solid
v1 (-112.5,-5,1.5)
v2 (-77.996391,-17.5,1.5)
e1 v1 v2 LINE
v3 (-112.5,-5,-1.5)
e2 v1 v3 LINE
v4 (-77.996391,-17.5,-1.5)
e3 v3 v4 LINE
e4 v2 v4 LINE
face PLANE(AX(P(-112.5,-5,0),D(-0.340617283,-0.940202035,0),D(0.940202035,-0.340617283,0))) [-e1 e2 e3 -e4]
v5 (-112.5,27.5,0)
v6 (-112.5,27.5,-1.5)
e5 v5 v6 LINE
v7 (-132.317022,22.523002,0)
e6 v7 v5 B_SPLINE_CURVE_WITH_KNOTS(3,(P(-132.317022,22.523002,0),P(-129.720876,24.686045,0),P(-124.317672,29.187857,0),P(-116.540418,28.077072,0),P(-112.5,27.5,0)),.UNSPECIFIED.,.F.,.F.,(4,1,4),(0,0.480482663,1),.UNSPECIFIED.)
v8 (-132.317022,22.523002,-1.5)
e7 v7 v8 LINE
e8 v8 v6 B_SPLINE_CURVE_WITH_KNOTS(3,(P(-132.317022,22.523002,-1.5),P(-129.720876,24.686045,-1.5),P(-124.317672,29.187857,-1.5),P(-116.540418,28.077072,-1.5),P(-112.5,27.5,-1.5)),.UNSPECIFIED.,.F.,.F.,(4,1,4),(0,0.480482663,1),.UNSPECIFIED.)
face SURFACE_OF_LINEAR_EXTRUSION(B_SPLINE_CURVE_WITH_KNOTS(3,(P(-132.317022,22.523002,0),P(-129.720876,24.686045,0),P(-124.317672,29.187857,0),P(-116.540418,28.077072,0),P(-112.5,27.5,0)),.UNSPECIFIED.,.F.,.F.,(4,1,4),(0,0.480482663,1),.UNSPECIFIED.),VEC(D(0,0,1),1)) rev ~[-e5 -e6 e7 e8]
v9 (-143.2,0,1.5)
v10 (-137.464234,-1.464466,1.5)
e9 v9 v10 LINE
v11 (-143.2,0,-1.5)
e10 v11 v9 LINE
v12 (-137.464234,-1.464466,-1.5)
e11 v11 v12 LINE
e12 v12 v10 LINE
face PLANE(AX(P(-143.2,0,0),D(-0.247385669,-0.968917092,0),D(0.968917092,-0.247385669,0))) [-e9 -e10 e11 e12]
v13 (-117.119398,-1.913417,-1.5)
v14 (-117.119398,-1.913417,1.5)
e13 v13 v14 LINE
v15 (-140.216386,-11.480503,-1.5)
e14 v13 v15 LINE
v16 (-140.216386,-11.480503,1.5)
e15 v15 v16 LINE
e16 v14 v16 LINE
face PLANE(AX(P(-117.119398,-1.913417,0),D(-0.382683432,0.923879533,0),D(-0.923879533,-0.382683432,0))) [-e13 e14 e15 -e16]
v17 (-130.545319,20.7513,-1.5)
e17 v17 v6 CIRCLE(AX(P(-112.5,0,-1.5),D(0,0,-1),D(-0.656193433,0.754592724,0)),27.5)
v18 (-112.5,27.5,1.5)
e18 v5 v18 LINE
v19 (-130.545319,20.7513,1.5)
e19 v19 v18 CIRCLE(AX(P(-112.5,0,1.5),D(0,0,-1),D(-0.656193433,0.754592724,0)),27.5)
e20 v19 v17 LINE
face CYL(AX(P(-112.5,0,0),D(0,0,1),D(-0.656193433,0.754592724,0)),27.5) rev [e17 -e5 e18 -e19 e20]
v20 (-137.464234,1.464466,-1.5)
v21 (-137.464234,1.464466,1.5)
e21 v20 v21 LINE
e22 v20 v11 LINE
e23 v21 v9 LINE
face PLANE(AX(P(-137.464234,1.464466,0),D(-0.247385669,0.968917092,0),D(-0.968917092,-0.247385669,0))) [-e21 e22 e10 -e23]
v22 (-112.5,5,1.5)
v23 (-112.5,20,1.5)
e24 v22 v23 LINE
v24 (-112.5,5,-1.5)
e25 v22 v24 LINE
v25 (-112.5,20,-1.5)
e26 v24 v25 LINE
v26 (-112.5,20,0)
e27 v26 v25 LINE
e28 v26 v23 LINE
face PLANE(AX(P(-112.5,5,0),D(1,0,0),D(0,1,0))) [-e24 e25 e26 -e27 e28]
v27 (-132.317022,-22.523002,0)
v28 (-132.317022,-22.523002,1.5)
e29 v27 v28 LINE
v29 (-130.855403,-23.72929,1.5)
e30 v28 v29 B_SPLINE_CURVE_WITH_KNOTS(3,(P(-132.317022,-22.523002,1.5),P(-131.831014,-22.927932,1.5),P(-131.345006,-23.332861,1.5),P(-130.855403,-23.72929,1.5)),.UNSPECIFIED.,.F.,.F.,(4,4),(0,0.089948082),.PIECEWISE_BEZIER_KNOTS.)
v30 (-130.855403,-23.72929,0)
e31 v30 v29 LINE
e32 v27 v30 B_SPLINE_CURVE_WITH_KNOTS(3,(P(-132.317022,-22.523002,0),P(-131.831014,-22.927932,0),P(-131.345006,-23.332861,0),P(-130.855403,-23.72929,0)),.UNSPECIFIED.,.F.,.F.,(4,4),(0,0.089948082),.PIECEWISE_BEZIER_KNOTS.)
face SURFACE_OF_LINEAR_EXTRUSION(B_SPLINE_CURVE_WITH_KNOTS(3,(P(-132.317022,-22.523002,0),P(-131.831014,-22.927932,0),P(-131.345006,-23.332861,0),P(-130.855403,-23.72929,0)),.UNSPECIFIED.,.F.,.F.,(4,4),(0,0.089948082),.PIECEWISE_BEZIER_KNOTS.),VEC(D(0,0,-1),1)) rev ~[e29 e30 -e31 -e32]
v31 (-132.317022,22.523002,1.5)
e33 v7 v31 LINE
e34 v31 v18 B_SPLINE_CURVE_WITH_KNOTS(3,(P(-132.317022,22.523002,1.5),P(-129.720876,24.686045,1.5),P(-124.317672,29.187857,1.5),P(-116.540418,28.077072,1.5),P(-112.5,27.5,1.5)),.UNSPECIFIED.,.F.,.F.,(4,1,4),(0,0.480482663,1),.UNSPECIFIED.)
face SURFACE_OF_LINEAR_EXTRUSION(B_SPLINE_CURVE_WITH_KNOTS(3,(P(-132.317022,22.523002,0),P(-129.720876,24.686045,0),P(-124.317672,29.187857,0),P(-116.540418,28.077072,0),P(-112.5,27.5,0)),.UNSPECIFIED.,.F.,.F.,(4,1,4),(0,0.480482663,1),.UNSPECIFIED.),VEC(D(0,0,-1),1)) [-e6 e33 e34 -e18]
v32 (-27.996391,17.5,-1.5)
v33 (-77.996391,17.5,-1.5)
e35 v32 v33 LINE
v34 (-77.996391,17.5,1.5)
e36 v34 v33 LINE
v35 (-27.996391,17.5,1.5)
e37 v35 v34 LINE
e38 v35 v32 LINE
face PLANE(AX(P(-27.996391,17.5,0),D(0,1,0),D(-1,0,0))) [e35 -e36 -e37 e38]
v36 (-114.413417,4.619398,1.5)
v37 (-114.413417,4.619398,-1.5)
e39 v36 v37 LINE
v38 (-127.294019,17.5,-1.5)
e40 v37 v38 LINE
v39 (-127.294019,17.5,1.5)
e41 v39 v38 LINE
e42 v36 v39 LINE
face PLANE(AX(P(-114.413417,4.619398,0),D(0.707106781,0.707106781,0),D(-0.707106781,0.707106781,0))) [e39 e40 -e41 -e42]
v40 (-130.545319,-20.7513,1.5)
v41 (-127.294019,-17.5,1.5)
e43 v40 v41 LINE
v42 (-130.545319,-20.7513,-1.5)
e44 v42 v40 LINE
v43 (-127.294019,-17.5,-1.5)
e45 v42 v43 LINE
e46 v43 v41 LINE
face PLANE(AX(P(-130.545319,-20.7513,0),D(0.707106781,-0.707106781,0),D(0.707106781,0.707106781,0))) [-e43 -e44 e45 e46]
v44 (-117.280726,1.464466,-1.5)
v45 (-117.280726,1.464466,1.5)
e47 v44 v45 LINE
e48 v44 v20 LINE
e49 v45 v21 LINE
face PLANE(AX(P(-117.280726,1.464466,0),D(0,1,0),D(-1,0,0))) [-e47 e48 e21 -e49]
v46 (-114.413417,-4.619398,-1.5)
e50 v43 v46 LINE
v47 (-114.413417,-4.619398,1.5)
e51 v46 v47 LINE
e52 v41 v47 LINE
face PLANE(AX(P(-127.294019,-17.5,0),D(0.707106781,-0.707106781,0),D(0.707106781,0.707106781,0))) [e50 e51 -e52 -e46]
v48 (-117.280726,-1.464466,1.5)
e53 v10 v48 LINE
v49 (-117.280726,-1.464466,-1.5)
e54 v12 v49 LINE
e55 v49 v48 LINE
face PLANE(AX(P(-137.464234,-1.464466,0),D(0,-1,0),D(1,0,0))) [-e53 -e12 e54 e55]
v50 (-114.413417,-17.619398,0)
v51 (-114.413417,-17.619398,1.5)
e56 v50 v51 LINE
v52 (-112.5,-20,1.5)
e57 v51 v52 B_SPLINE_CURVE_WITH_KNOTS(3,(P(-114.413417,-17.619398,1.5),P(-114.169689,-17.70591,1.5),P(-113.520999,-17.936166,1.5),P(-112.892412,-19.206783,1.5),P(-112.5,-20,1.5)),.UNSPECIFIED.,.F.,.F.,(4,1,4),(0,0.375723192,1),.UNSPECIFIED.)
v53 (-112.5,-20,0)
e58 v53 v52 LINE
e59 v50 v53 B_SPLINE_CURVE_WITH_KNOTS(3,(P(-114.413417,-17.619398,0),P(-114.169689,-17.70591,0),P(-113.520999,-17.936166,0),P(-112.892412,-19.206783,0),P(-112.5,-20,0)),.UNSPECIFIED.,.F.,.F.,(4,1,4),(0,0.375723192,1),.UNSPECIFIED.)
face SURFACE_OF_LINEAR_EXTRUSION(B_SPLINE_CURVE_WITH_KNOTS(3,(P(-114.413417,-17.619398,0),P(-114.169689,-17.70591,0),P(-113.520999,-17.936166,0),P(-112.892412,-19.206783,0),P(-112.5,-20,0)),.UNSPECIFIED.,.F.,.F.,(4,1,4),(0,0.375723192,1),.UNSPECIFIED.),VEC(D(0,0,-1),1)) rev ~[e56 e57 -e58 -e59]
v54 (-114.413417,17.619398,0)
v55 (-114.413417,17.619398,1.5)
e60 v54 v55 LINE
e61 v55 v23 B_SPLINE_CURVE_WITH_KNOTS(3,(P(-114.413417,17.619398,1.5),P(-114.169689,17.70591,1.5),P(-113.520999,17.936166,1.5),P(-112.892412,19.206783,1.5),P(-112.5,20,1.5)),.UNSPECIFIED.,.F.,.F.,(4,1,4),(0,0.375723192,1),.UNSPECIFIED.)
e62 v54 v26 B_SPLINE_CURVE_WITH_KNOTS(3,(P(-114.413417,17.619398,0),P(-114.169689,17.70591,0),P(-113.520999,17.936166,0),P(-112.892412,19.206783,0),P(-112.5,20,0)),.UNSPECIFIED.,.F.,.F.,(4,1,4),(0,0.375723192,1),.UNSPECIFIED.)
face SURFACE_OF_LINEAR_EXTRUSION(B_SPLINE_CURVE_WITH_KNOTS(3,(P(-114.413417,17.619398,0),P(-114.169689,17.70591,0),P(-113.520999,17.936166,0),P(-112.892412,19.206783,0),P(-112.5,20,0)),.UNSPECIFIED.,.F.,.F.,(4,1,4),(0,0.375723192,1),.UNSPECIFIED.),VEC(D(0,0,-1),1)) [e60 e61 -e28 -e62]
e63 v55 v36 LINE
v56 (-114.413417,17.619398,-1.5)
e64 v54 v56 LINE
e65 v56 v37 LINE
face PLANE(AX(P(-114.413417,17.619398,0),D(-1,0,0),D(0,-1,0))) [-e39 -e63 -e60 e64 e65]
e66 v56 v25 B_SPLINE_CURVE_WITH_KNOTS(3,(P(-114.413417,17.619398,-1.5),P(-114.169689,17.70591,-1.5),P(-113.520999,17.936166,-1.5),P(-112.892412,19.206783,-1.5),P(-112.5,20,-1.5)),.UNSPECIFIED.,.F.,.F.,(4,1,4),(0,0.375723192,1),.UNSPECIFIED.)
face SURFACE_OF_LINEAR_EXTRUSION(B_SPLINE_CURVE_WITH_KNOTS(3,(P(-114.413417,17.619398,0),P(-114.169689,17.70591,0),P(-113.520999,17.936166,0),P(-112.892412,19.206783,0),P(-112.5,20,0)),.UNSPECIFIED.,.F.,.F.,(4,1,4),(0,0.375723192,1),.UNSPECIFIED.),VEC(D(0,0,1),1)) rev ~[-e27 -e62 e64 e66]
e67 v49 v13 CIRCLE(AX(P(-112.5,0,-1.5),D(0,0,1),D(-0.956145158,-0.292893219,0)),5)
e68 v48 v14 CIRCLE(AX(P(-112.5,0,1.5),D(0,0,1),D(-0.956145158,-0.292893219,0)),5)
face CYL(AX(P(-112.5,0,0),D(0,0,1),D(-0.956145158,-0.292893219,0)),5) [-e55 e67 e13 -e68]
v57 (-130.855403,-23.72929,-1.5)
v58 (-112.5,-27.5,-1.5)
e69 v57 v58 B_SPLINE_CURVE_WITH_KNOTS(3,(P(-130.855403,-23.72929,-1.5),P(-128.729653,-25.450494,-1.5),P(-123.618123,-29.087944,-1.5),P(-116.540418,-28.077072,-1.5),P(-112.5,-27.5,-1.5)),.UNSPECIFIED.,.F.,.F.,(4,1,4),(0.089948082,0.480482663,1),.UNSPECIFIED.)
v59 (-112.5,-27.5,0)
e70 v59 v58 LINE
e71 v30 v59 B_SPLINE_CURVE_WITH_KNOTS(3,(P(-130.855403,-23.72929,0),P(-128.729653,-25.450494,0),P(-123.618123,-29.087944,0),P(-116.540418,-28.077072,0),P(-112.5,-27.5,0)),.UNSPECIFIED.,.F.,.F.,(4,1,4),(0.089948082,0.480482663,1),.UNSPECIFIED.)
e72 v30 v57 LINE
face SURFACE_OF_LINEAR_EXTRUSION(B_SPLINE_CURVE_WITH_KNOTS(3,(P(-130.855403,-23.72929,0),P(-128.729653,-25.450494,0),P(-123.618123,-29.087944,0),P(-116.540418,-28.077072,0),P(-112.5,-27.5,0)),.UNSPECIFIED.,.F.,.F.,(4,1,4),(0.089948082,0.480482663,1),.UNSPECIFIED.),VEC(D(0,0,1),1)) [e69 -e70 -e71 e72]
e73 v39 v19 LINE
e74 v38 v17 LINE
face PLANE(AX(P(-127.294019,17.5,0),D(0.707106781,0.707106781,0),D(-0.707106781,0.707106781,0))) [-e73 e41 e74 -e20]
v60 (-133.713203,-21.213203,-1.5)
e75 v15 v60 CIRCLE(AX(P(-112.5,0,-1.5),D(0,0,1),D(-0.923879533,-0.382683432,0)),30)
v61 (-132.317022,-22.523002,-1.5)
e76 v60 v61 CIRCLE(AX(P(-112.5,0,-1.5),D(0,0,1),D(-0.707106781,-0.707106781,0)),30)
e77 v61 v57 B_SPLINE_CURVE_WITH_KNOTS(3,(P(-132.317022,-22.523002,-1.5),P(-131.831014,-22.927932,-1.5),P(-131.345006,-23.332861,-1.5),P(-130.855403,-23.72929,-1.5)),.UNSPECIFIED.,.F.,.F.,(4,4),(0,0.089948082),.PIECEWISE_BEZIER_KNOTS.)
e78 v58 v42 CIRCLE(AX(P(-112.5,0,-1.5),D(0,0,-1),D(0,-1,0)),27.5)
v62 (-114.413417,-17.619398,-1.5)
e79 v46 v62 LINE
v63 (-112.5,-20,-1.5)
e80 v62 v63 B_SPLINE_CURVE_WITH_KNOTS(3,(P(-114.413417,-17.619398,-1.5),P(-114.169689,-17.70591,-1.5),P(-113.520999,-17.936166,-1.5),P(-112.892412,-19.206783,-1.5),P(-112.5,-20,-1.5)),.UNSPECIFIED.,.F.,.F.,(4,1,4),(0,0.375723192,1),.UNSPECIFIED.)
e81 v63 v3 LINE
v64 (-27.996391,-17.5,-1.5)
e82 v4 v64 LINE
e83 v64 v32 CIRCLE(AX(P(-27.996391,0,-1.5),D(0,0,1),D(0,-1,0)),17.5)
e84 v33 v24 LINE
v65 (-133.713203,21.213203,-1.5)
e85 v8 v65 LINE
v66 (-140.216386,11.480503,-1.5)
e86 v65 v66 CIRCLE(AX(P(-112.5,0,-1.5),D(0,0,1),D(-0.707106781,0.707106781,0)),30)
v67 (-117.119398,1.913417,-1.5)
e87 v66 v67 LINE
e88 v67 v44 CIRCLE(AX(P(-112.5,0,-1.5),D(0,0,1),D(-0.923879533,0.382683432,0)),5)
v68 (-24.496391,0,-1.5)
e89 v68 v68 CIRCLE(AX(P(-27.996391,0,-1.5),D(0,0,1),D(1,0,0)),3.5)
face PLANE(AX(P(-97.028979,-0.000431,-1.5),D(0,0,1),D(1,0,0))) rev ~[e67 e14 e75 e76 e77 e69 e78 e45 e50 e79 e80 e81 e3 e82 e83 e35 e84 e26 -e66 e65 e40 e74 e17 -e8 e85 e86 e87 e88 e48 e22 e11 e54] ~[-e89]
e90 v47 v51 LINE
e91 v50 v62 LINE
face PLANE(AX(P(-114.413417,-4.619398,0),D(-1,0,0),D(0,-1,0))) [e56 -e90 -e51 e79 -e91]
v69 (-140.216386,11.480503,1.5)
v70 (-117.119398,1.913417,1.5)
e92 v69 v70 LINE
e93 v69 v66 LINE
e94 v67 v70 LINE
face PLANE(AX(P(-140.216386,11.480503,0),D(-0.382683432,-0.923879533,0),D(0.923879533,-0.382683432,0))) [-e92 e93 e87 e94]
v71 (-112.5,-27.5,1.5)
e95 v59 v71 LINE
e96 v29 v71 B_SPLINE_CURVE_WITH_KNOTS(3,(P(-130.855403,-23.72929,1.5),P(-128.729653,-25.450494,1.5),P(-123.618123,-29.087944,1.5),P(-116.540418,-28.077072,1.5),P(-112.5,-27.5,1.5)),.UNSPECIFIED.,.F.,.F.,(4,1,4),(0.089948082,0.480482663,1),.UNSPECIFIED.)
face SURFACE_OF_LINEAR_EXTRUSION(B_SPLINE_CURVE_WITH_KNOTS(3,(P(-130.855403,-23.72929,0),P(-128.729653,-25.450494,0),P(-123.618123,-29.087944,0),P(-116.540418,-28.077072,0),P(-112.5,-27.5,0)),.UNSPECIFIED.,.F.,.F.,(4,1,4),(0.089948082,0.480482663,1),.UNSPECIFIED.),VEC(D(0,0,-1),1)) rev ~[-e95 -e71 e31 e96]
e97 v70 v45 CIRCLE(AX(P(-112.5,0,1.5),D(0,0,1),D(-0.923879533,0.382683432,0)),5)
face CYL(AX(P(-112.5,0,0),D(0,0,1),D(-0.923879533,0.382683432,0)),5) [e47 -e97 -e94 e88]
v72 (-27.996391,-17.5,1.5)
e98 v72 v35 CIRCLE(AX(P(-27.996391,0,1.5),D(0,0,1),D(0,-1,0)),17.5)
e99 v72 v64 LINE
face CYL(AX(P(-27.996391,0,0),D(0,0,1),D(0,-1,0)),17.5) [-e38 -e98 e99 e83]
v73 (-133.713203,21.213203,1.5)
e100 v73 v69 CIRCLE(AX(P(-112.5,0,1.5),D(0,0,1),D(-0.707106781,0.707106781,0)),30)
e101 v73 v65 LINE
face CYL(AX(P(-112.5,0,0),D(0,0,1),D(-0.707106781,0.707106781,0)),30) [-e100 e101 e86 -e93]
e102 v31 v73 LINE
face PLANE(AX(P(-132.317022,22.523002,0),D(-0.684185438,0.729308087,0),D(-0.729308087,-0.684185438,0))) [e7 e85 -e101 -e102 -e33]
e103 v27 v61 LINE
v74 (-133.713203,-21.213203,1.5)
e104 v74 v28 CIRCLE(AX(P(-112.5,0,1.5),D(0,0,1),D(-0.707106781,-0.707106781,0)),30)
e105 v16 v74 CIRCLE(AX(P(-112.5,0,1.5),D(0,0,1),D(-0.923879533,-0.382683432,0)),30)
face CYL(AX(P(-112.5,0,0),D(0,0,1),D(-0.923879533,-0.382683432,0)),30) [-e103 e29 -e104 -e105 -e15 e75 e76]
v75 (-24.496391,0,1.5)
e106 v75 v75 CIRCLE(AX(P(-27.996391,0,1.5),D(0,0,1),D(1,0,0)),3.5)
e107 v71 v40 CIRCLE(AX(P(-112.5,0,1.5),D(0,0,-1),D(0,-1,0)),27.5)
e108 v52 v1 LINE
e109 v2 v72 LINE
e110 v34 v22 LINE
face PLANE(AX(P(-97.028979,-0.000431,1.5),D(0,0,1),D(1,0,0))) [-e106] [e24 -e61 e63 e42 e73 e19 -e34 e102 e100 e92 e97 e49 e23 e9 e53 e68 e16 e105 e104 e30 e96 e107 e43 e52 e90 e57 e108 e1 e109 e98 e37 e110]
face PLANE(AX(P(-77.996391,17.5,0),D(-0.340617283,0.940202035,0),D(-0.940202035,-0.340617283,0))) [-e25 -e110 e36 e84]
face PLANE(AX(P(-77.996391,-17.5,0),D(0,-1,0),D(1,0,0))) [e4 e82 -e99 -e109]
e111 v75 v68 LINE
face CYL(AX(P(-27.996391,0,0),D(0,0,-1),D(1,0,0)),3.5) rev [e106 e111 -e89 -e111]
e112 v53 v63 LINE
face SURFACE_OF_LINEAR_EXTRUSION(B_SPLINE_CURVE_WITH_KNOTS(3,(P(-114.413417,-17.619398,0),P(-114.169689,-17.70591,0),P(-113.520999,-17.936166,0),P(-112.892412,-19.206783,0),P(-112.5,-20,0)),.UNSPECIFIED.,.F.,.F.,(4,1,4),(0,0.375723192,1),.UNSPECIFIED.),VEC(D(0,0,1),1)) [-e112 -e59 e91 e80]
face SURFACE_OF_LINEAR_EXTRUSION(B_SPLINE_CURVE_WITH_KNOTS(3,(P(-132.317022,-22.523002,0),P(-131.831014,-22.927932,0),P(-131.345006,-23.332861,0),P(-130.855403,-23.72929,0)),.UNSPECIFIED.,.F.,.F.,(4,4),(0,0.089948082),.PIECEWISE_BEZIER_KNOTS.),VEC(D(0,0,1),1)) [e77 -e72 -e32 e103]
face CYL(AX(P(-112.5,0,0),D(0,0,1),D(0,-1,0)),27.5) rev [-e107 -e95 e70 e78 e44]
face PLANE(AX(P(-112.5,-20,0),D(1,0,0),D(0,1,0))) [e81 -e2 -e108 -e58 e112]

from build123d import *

# Parameters (mm, degrees)
F0_R     = 3.5
F1_DEPTH = 1.5


# Not quite as in the source:
# - a feature names something its author has since deleted; it is built from what else it names


with BuildPart() as f1:
    # F0 (on Top) → F1 (new body, symmetric)
    with BuildSketch(Plane.XY):
        with BuildLine():
            Line((-140.2163859753, 11.480502971), (-117.1193976626, 1.9134171618))
            ThreePointArc((-117.1193976626, 1.9134171618), (-117.2054191616, 1.6908667936), (-117.2807257879, 1.4644660941))
            Line((-117.2807257879, 1.4644660941), (-135.5639451435, 1.4644660941))
            Line((-135.5639451435, 1.4644660941), (-137.4212426417, 1.4644660941))
            Line((-137.4212426417, 1.4644660941), (-137.4642343313, 1.4644660941))
            Line((-137.4642343313, 1.4644660941), (-143.2, 0))
            Line((-143.2, 0), (-137.4642343313, -1.4644660941))
            Line((-137.4642343313, -1.4644660941), (-137.4212426417, -1.4644660941))
            Line((-137.4212426417, -1.4644660941), (-135.5639451435, -1.4644660941))
            Line((-135.5639451435, -1.4644660941), (-117.2807257879, -1.4644660941))
            ThreePointArc((-117.2807257879, -1.4644660941), (-117.2054191616, -1.6908667936), (-117.1193976626, -1.9134171618))
            Line((-117.1193976626, -1.9134171618), (-140.2163859753, -11.480502971))
            ThreePointArc((-140.2163859753, -11.480502971), (-137.4440883691, -16.6671069906), (-133.7132034356, -21.2132034356))
            ThreePointArc((-133.7132034356, -21.2132034356), (-133.0255631487, -21.8792426155), (-132.3170219693, -22.5230024701))
            add(Edge.make_bspline(
                [(-132.3170219693, -22.5230024701), (-131.8310141521, -22.9279318204), (-131.3450063349, -23.3328611708), (-130.8554027807, -23.7292896809)],
                knots=[0, 0, 0, 0, 0.0899480821, 0.0899480821, 0.0899480821, 0.0899480821], degree=3))
            add(Edge.make_bspline(
                [(-130.8554027807, -23.7292896809), (-128.7296529668, -25.4504941622), (-123.6181233569, -29.0879440293), (-116.5404183436, -28.0770720452), (-112.5, -27.5)],
                knots=[0.0899480821, 0.0899480821, 0.0899480821, 0.0899480821, 0.4804826627, 1, 1, 1, 1], degree=3))
            ThreePointArc((-112.5, -27.5), (-122.1329967473, -25.7576274852), (-130.5453194023, -20.7512999031))
            Line((-130.5453194023, -20.7512999031), (-127.2940194993, -17.5))
            Line((-127.2940194993, -17.5), (-114.4134171618, -4.6193976626))
            Line((-114.4134171618, -4.6193976626), (-114.4134171618, -17.6193976626))
            add(Edge.make_bspline(
                [(-114.4134171618, -17.6193976626), (-114.1696893018, -17.7059100784), (-113.5209993488, -17.936165803), (-112.89241231, -19.2067830939), (-112.5, -20)],
                knots=[0, 0, 0, 0, 0.3757231924, 1, 1, 1, 1], degree=3))
            Line((-112.5, -20), (-112.5, -5))
            Line((-112.5, -5), (-77.9963913669, -17.5))
            Line((-77.9963913669, -17.5), (-27.9963913669, -17.5))
            ThreePointArc((-27.9963913669, -17.5), (-10.4963913669, 0), (-27.9963913669, 17.5))
            Line((-27.9963913669, 17.5), (-77.9963913669, 17.5))
            Line((-77.9963913669, 17.5), (-112.5, 5))
            Line((-112.5, 5), (-112.5, 20))
            add(Edge.make_bspline(
                [(-114.4134171618, 17.6193976626), (-114.1696893018, 17.7059100784), (-113.5209993488, 17.936165803), (-112.89241231, 19.2067830939), (-112.5, 20)],
                knots=[0, 0, 0, 0, 0.3757231924, 1, 1, 1, 1], degree=3))
            Line((-114.4134171618, 17.6193976626), (-114.4134171618, 4.6193976626))
            Line((-114.4134171618, 4.6193976626), (-127.2940194993, 17.5))
            Line((-127.2940194993, 17.5), (-130.5453194023, 20.7512999031))
            ThreePointArc((-130.5453194023, 20.7512999031), (-122.1329967473, 25.7576274852), (-112.5, 27.5))
            add(Edge.make_bspline(
                [(-132.3170219693, 22.5230024701), (-129.7208762292, 24.6860450606), (-124.3176724473, 29.1878570062), (-116.5404183436, 28.0770720452), (-112.5, 27.5)],
                knots=[0, 0, 0, 0, 0.4804826627, 1, 1, 1, 1], degree=3))
            Line((-132.3170219693, 22.5230024701), (-133.7132034356, 21.2132034356))
            ThreePointArc((-133.7132034356, 21.2132034356), (-137.4440883691, 16.6671069906), (-140.2163859753, 11.480502971))
        make_face()
        with Locations((-27.9963913669, 0)):
            Circle(F0_R, mode=Mode.SUBTRACT)
    extrude(amount=F1_DEPTH, both=True)


solid = f1.part
